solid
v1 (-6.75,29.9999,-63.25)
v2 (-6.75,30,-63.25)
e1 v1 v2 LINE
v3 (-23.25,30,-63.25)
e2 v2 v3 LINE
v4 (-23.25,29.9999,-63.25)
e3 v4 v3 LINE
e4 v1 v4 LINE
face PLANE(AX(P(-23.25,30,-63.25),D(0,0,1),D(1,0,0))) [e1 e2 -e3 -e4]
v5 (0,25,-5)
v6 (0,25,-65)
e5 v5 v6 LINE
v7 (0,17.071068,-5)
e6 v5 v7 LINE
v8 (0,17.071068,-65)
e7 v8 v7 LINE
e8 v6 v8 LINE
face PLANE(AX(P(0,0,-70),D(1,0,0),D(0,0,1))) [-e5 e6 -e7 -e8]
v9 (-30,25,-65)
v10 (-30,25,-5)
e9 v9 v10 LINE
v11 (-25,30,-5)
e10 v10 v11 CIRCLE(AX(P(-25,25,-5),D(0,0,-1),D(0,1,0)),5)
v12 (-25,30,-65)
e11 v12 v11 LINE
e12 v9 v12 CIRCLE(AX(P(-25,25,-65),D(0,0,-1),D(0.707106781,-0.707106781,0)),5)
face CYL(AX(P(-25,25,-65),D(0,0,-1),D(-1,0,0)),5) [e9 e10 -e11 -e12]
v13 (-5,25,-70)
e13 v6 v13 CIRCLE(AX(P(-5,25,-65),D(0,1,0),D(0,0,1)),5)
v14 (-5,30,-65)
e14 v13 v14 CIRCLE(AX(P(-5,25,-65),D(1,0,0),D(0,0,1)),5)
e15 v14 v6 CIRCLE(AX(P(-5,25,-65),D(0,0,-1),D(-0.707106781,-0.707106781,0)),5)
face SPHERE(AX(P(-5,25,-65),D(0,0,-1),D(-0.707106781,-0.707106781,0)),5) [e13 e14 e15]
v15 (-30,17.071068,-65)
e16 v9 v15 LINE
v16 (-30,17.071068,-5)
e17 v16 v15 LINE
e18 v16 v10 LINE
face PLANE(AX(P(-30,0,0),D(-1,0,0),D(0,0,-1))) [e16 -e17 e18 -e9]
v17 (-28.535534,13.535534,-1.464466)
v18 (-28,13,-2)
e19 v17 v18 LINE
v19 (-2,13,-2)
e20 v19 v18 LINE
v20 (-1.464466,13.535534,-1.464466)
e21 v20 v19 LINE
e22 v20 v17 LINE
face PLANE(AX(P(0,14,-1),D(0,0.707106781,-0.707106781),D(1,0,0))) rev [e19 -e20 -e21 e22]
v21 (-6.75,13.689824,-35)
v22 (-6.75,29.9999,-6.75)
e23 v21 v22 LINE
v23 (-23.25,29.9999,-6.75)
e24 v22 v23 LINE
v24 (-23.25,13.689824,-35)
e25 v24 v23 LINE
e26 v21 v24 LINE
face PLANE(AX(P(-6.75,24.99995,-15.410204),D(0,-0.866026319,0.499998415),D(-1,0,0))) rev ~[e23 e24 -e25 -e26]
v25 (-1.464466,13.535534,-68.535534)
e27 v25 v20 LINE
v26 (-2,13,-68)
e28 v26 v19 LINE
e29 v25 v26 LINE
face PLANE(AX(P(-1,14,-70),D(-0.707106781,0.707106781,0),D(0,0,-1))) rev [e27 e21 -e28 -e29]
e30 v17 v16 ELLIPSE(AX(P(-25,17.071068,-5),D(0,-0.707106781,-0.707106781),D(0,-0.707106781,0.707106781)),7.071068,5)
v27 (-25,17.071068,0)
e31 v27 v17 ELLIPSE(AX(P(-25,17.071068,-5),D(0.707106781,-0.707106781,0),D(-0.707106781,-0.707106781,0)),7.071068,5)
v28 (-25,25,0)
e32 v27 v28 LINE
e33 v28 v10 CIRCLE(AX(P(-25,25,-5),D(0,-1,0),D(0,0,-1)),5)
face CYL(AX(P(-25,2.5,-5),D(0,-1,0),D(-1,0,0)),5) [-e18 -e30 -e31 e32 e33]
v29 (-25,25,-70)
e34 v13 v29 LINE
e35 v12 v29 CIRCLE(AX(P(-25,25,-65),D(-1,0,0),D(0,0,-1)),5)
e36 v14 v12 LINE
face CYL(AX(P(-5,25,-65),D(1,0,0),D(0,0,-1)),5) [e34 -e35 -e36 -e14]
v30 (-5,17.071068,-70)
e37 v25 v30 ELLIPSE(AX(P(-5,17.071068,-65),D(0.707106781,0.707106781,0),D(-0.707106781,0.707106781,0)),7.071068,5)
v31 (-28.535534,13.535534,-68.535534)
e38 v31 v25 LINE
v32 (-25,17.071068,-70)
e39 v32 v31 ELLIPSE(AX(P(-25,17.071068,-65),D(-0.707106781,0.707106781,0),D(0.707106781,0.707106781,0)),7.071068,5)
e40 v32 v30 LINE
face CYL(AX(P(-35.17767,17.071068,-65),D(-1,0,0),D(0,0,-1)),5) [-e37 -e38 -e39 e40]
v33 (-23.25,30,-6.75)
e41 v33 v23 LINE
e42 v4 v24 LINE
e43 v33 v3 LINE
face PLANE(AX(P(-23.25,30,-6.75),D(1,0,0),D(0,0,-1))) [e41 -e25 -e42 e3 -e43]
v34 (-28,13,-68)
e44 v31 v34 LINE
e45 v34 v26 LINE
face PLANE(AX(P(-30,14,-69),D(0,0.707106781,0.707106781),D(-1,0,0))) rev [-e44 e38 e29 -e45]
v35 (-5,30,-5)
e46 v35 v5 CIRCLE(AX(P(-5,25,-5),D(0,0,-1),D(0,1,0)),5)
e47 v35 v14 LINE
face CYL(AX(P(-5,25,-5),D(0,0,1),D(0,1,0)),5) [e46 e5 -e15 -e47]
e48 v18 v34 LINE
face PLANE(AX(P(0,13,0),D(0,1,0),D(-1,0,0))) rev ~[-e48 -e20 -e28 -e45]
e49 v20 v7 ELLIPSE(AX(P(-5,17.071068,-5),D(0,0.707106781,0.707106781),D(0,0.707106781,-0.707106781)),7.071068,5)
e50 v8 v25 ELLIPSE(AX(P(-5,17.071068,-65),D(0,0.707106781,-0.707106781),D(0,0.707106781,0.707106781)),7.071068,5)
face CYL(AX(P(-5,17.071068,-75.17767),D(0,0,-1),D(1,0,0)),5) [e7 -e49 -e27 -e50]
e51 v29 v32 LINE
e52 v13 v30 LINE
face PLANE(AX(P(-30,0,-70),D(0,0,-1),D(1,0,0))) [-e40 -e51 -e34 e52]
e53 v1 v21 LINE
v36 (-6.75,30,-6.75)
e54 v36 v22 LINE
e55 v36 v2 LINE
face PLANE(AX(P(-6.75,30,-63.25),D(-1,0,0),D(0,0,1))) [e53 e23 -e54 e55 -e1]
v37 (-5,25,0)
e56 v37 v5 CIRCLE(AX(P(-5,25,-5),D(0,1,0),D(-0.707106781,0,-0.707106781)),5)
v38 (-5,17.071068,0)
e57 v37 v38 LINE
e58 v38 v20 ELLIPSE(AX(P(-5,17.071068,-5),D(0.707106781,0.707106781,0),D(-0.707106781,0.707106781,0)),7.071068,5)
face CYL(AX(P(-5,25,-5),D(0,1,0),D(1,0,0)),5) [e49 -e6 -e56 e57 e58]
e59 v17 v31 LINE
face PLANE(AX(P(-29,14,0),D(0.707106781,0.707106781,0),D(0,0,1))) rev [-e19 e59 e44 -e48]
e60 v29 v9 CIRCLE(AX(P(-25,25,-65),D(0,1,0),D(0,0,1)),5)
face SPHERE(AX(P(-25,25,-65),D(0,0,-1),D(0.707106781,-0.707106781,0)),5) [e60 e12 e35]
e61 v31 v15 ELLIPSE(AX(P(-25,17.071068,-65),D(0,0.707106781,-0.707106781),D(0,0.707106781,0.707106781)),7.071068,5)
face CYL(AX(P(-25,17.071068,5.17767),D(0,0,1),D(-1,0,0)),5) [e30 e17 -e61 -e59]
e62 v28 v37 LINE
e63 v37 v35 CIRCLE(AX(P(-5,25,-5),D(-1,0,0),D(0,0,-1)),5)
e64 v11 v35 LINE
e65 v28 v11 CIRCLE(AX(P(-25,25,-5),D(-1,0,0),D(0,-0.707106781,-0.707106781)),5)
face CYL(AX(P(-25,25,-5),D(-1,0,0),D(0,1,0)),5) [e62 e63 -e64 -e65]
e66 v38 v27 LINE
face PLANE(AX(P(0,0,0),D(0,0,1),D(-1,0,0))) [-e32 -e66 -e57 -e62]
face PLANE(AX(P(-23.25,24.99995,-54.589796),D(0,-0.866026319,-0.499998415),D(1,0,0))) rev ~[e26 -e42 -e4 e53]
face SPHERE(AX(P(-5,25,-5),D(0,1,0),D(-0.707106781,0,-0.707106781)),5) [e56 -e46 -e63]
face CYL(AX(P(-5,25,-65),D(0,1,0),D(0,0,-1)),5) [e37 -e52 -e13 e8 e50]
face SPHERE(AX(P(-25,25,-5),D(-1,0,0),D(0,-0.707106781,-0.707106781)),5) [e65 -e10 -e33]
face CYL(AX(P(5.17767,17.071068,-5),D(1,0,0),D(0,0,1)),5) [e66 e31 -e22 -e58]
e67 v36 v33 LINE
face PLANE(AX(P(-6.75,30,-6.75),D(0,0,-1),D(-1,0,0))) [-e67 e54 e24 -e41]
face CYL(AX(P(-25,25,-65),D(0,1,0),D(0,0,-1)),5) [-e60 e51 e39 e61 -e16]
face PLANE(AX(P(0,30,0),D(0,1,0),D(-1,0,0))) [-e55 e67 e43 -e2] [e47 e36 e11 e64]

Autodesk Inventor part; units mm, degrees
ref_plane "YZ Plane" through (0, 0, 0) normal (1, 0, 0) x (0, 1, 0)
ref_plane "XZ Plane" through (0, 0, 0) normal (0, 1, 0) x (-1, 0, 0)
ref_plane "XY Plane" through (0, 0, 0) normal (0, 0, 1) x (1, 0, 0)
sketch "Sketch1" plane through (0, 0, 0) normal (0, 1, 0) x (-1, 0, 0)
  line L0 (0, 0) -> (30, 0)
  line L1 (30, 0) -> (30, -70)
  line L2 (30, -70) -> (0, -70)
  line L3 (0, -70) -> (0, 0)
  dimension "d0" = 70
  dimension "d1" = 30
extrude "Extrusion1" add sketch "Sketch1" along normal blind 30
sketch "Sketch2" plane through (0, 30, 0) normal (0, 1, 0) x (1, 0, 0)
  line L0 (-30, 70) -> (-30, 0) projected
  line L1 (0, 70) -> (-30, 70) projected
  line L2 (-30, 0) -> (0, 0)
  line L3 (0, 0) -> (0, 70)
  line L4 (0, 70) -> (-30, 70)
  line L5 (-30, 70) -> (-30, 0)
  line L6 (-6.75, 6.75) -> (-23.25, 6.75)
  line L7 (-23.25, 6.75) -> (-23.25, 63.25)
  line L8 (-23.25, 63.25) -> (-6.75, 63.25)
  line L9 (-6.75, 63.25) -> (-6.75, 6.75)
  dimension "d4" = 16.5
extrude "Extrusion2" cut sketch "Sketch2" against normal blind 10 contours L6 L7 L8 L9
chamfer "Chamfer1" distance 10 angle 60 1 edges at (-15, 20, -63.25) measured on face at (-12.25, 23.3333, -63.25)
chamfer "Chamfer3" distance 10 angle 60 1 edges at (-15, 20, -6.75) measured on face at (-17.75, 23.3333, -6.75)
move faces "Move1" translate (0, -7.938, 0) faces at (-12.25, 20, -38.6432)
move faces "Move2" translate (0, 13, 0) faces at (-20, 0, -46.6667)
chamfer "Chamfer4" distance 2 angle 45 4 edges at (-15, 13, 0) (0, 13, -35) (-30, 13, -35) (-15, 13, -70)
fillet "Fillet1" radius 5 12 edges at (-30, 22.5, 0) (0, 22.5, 0) (0, 22.5, -70) (-30, 22.5, -70) (-15, 30, 0) (-30, 30, -35) (-15, 30, -70) (0, 30, -35) (-15, 15, 0) (0, 15, -35) (-15, 15, -70) (-30, 15, -35)
properties part number "CalibrationPlate"
